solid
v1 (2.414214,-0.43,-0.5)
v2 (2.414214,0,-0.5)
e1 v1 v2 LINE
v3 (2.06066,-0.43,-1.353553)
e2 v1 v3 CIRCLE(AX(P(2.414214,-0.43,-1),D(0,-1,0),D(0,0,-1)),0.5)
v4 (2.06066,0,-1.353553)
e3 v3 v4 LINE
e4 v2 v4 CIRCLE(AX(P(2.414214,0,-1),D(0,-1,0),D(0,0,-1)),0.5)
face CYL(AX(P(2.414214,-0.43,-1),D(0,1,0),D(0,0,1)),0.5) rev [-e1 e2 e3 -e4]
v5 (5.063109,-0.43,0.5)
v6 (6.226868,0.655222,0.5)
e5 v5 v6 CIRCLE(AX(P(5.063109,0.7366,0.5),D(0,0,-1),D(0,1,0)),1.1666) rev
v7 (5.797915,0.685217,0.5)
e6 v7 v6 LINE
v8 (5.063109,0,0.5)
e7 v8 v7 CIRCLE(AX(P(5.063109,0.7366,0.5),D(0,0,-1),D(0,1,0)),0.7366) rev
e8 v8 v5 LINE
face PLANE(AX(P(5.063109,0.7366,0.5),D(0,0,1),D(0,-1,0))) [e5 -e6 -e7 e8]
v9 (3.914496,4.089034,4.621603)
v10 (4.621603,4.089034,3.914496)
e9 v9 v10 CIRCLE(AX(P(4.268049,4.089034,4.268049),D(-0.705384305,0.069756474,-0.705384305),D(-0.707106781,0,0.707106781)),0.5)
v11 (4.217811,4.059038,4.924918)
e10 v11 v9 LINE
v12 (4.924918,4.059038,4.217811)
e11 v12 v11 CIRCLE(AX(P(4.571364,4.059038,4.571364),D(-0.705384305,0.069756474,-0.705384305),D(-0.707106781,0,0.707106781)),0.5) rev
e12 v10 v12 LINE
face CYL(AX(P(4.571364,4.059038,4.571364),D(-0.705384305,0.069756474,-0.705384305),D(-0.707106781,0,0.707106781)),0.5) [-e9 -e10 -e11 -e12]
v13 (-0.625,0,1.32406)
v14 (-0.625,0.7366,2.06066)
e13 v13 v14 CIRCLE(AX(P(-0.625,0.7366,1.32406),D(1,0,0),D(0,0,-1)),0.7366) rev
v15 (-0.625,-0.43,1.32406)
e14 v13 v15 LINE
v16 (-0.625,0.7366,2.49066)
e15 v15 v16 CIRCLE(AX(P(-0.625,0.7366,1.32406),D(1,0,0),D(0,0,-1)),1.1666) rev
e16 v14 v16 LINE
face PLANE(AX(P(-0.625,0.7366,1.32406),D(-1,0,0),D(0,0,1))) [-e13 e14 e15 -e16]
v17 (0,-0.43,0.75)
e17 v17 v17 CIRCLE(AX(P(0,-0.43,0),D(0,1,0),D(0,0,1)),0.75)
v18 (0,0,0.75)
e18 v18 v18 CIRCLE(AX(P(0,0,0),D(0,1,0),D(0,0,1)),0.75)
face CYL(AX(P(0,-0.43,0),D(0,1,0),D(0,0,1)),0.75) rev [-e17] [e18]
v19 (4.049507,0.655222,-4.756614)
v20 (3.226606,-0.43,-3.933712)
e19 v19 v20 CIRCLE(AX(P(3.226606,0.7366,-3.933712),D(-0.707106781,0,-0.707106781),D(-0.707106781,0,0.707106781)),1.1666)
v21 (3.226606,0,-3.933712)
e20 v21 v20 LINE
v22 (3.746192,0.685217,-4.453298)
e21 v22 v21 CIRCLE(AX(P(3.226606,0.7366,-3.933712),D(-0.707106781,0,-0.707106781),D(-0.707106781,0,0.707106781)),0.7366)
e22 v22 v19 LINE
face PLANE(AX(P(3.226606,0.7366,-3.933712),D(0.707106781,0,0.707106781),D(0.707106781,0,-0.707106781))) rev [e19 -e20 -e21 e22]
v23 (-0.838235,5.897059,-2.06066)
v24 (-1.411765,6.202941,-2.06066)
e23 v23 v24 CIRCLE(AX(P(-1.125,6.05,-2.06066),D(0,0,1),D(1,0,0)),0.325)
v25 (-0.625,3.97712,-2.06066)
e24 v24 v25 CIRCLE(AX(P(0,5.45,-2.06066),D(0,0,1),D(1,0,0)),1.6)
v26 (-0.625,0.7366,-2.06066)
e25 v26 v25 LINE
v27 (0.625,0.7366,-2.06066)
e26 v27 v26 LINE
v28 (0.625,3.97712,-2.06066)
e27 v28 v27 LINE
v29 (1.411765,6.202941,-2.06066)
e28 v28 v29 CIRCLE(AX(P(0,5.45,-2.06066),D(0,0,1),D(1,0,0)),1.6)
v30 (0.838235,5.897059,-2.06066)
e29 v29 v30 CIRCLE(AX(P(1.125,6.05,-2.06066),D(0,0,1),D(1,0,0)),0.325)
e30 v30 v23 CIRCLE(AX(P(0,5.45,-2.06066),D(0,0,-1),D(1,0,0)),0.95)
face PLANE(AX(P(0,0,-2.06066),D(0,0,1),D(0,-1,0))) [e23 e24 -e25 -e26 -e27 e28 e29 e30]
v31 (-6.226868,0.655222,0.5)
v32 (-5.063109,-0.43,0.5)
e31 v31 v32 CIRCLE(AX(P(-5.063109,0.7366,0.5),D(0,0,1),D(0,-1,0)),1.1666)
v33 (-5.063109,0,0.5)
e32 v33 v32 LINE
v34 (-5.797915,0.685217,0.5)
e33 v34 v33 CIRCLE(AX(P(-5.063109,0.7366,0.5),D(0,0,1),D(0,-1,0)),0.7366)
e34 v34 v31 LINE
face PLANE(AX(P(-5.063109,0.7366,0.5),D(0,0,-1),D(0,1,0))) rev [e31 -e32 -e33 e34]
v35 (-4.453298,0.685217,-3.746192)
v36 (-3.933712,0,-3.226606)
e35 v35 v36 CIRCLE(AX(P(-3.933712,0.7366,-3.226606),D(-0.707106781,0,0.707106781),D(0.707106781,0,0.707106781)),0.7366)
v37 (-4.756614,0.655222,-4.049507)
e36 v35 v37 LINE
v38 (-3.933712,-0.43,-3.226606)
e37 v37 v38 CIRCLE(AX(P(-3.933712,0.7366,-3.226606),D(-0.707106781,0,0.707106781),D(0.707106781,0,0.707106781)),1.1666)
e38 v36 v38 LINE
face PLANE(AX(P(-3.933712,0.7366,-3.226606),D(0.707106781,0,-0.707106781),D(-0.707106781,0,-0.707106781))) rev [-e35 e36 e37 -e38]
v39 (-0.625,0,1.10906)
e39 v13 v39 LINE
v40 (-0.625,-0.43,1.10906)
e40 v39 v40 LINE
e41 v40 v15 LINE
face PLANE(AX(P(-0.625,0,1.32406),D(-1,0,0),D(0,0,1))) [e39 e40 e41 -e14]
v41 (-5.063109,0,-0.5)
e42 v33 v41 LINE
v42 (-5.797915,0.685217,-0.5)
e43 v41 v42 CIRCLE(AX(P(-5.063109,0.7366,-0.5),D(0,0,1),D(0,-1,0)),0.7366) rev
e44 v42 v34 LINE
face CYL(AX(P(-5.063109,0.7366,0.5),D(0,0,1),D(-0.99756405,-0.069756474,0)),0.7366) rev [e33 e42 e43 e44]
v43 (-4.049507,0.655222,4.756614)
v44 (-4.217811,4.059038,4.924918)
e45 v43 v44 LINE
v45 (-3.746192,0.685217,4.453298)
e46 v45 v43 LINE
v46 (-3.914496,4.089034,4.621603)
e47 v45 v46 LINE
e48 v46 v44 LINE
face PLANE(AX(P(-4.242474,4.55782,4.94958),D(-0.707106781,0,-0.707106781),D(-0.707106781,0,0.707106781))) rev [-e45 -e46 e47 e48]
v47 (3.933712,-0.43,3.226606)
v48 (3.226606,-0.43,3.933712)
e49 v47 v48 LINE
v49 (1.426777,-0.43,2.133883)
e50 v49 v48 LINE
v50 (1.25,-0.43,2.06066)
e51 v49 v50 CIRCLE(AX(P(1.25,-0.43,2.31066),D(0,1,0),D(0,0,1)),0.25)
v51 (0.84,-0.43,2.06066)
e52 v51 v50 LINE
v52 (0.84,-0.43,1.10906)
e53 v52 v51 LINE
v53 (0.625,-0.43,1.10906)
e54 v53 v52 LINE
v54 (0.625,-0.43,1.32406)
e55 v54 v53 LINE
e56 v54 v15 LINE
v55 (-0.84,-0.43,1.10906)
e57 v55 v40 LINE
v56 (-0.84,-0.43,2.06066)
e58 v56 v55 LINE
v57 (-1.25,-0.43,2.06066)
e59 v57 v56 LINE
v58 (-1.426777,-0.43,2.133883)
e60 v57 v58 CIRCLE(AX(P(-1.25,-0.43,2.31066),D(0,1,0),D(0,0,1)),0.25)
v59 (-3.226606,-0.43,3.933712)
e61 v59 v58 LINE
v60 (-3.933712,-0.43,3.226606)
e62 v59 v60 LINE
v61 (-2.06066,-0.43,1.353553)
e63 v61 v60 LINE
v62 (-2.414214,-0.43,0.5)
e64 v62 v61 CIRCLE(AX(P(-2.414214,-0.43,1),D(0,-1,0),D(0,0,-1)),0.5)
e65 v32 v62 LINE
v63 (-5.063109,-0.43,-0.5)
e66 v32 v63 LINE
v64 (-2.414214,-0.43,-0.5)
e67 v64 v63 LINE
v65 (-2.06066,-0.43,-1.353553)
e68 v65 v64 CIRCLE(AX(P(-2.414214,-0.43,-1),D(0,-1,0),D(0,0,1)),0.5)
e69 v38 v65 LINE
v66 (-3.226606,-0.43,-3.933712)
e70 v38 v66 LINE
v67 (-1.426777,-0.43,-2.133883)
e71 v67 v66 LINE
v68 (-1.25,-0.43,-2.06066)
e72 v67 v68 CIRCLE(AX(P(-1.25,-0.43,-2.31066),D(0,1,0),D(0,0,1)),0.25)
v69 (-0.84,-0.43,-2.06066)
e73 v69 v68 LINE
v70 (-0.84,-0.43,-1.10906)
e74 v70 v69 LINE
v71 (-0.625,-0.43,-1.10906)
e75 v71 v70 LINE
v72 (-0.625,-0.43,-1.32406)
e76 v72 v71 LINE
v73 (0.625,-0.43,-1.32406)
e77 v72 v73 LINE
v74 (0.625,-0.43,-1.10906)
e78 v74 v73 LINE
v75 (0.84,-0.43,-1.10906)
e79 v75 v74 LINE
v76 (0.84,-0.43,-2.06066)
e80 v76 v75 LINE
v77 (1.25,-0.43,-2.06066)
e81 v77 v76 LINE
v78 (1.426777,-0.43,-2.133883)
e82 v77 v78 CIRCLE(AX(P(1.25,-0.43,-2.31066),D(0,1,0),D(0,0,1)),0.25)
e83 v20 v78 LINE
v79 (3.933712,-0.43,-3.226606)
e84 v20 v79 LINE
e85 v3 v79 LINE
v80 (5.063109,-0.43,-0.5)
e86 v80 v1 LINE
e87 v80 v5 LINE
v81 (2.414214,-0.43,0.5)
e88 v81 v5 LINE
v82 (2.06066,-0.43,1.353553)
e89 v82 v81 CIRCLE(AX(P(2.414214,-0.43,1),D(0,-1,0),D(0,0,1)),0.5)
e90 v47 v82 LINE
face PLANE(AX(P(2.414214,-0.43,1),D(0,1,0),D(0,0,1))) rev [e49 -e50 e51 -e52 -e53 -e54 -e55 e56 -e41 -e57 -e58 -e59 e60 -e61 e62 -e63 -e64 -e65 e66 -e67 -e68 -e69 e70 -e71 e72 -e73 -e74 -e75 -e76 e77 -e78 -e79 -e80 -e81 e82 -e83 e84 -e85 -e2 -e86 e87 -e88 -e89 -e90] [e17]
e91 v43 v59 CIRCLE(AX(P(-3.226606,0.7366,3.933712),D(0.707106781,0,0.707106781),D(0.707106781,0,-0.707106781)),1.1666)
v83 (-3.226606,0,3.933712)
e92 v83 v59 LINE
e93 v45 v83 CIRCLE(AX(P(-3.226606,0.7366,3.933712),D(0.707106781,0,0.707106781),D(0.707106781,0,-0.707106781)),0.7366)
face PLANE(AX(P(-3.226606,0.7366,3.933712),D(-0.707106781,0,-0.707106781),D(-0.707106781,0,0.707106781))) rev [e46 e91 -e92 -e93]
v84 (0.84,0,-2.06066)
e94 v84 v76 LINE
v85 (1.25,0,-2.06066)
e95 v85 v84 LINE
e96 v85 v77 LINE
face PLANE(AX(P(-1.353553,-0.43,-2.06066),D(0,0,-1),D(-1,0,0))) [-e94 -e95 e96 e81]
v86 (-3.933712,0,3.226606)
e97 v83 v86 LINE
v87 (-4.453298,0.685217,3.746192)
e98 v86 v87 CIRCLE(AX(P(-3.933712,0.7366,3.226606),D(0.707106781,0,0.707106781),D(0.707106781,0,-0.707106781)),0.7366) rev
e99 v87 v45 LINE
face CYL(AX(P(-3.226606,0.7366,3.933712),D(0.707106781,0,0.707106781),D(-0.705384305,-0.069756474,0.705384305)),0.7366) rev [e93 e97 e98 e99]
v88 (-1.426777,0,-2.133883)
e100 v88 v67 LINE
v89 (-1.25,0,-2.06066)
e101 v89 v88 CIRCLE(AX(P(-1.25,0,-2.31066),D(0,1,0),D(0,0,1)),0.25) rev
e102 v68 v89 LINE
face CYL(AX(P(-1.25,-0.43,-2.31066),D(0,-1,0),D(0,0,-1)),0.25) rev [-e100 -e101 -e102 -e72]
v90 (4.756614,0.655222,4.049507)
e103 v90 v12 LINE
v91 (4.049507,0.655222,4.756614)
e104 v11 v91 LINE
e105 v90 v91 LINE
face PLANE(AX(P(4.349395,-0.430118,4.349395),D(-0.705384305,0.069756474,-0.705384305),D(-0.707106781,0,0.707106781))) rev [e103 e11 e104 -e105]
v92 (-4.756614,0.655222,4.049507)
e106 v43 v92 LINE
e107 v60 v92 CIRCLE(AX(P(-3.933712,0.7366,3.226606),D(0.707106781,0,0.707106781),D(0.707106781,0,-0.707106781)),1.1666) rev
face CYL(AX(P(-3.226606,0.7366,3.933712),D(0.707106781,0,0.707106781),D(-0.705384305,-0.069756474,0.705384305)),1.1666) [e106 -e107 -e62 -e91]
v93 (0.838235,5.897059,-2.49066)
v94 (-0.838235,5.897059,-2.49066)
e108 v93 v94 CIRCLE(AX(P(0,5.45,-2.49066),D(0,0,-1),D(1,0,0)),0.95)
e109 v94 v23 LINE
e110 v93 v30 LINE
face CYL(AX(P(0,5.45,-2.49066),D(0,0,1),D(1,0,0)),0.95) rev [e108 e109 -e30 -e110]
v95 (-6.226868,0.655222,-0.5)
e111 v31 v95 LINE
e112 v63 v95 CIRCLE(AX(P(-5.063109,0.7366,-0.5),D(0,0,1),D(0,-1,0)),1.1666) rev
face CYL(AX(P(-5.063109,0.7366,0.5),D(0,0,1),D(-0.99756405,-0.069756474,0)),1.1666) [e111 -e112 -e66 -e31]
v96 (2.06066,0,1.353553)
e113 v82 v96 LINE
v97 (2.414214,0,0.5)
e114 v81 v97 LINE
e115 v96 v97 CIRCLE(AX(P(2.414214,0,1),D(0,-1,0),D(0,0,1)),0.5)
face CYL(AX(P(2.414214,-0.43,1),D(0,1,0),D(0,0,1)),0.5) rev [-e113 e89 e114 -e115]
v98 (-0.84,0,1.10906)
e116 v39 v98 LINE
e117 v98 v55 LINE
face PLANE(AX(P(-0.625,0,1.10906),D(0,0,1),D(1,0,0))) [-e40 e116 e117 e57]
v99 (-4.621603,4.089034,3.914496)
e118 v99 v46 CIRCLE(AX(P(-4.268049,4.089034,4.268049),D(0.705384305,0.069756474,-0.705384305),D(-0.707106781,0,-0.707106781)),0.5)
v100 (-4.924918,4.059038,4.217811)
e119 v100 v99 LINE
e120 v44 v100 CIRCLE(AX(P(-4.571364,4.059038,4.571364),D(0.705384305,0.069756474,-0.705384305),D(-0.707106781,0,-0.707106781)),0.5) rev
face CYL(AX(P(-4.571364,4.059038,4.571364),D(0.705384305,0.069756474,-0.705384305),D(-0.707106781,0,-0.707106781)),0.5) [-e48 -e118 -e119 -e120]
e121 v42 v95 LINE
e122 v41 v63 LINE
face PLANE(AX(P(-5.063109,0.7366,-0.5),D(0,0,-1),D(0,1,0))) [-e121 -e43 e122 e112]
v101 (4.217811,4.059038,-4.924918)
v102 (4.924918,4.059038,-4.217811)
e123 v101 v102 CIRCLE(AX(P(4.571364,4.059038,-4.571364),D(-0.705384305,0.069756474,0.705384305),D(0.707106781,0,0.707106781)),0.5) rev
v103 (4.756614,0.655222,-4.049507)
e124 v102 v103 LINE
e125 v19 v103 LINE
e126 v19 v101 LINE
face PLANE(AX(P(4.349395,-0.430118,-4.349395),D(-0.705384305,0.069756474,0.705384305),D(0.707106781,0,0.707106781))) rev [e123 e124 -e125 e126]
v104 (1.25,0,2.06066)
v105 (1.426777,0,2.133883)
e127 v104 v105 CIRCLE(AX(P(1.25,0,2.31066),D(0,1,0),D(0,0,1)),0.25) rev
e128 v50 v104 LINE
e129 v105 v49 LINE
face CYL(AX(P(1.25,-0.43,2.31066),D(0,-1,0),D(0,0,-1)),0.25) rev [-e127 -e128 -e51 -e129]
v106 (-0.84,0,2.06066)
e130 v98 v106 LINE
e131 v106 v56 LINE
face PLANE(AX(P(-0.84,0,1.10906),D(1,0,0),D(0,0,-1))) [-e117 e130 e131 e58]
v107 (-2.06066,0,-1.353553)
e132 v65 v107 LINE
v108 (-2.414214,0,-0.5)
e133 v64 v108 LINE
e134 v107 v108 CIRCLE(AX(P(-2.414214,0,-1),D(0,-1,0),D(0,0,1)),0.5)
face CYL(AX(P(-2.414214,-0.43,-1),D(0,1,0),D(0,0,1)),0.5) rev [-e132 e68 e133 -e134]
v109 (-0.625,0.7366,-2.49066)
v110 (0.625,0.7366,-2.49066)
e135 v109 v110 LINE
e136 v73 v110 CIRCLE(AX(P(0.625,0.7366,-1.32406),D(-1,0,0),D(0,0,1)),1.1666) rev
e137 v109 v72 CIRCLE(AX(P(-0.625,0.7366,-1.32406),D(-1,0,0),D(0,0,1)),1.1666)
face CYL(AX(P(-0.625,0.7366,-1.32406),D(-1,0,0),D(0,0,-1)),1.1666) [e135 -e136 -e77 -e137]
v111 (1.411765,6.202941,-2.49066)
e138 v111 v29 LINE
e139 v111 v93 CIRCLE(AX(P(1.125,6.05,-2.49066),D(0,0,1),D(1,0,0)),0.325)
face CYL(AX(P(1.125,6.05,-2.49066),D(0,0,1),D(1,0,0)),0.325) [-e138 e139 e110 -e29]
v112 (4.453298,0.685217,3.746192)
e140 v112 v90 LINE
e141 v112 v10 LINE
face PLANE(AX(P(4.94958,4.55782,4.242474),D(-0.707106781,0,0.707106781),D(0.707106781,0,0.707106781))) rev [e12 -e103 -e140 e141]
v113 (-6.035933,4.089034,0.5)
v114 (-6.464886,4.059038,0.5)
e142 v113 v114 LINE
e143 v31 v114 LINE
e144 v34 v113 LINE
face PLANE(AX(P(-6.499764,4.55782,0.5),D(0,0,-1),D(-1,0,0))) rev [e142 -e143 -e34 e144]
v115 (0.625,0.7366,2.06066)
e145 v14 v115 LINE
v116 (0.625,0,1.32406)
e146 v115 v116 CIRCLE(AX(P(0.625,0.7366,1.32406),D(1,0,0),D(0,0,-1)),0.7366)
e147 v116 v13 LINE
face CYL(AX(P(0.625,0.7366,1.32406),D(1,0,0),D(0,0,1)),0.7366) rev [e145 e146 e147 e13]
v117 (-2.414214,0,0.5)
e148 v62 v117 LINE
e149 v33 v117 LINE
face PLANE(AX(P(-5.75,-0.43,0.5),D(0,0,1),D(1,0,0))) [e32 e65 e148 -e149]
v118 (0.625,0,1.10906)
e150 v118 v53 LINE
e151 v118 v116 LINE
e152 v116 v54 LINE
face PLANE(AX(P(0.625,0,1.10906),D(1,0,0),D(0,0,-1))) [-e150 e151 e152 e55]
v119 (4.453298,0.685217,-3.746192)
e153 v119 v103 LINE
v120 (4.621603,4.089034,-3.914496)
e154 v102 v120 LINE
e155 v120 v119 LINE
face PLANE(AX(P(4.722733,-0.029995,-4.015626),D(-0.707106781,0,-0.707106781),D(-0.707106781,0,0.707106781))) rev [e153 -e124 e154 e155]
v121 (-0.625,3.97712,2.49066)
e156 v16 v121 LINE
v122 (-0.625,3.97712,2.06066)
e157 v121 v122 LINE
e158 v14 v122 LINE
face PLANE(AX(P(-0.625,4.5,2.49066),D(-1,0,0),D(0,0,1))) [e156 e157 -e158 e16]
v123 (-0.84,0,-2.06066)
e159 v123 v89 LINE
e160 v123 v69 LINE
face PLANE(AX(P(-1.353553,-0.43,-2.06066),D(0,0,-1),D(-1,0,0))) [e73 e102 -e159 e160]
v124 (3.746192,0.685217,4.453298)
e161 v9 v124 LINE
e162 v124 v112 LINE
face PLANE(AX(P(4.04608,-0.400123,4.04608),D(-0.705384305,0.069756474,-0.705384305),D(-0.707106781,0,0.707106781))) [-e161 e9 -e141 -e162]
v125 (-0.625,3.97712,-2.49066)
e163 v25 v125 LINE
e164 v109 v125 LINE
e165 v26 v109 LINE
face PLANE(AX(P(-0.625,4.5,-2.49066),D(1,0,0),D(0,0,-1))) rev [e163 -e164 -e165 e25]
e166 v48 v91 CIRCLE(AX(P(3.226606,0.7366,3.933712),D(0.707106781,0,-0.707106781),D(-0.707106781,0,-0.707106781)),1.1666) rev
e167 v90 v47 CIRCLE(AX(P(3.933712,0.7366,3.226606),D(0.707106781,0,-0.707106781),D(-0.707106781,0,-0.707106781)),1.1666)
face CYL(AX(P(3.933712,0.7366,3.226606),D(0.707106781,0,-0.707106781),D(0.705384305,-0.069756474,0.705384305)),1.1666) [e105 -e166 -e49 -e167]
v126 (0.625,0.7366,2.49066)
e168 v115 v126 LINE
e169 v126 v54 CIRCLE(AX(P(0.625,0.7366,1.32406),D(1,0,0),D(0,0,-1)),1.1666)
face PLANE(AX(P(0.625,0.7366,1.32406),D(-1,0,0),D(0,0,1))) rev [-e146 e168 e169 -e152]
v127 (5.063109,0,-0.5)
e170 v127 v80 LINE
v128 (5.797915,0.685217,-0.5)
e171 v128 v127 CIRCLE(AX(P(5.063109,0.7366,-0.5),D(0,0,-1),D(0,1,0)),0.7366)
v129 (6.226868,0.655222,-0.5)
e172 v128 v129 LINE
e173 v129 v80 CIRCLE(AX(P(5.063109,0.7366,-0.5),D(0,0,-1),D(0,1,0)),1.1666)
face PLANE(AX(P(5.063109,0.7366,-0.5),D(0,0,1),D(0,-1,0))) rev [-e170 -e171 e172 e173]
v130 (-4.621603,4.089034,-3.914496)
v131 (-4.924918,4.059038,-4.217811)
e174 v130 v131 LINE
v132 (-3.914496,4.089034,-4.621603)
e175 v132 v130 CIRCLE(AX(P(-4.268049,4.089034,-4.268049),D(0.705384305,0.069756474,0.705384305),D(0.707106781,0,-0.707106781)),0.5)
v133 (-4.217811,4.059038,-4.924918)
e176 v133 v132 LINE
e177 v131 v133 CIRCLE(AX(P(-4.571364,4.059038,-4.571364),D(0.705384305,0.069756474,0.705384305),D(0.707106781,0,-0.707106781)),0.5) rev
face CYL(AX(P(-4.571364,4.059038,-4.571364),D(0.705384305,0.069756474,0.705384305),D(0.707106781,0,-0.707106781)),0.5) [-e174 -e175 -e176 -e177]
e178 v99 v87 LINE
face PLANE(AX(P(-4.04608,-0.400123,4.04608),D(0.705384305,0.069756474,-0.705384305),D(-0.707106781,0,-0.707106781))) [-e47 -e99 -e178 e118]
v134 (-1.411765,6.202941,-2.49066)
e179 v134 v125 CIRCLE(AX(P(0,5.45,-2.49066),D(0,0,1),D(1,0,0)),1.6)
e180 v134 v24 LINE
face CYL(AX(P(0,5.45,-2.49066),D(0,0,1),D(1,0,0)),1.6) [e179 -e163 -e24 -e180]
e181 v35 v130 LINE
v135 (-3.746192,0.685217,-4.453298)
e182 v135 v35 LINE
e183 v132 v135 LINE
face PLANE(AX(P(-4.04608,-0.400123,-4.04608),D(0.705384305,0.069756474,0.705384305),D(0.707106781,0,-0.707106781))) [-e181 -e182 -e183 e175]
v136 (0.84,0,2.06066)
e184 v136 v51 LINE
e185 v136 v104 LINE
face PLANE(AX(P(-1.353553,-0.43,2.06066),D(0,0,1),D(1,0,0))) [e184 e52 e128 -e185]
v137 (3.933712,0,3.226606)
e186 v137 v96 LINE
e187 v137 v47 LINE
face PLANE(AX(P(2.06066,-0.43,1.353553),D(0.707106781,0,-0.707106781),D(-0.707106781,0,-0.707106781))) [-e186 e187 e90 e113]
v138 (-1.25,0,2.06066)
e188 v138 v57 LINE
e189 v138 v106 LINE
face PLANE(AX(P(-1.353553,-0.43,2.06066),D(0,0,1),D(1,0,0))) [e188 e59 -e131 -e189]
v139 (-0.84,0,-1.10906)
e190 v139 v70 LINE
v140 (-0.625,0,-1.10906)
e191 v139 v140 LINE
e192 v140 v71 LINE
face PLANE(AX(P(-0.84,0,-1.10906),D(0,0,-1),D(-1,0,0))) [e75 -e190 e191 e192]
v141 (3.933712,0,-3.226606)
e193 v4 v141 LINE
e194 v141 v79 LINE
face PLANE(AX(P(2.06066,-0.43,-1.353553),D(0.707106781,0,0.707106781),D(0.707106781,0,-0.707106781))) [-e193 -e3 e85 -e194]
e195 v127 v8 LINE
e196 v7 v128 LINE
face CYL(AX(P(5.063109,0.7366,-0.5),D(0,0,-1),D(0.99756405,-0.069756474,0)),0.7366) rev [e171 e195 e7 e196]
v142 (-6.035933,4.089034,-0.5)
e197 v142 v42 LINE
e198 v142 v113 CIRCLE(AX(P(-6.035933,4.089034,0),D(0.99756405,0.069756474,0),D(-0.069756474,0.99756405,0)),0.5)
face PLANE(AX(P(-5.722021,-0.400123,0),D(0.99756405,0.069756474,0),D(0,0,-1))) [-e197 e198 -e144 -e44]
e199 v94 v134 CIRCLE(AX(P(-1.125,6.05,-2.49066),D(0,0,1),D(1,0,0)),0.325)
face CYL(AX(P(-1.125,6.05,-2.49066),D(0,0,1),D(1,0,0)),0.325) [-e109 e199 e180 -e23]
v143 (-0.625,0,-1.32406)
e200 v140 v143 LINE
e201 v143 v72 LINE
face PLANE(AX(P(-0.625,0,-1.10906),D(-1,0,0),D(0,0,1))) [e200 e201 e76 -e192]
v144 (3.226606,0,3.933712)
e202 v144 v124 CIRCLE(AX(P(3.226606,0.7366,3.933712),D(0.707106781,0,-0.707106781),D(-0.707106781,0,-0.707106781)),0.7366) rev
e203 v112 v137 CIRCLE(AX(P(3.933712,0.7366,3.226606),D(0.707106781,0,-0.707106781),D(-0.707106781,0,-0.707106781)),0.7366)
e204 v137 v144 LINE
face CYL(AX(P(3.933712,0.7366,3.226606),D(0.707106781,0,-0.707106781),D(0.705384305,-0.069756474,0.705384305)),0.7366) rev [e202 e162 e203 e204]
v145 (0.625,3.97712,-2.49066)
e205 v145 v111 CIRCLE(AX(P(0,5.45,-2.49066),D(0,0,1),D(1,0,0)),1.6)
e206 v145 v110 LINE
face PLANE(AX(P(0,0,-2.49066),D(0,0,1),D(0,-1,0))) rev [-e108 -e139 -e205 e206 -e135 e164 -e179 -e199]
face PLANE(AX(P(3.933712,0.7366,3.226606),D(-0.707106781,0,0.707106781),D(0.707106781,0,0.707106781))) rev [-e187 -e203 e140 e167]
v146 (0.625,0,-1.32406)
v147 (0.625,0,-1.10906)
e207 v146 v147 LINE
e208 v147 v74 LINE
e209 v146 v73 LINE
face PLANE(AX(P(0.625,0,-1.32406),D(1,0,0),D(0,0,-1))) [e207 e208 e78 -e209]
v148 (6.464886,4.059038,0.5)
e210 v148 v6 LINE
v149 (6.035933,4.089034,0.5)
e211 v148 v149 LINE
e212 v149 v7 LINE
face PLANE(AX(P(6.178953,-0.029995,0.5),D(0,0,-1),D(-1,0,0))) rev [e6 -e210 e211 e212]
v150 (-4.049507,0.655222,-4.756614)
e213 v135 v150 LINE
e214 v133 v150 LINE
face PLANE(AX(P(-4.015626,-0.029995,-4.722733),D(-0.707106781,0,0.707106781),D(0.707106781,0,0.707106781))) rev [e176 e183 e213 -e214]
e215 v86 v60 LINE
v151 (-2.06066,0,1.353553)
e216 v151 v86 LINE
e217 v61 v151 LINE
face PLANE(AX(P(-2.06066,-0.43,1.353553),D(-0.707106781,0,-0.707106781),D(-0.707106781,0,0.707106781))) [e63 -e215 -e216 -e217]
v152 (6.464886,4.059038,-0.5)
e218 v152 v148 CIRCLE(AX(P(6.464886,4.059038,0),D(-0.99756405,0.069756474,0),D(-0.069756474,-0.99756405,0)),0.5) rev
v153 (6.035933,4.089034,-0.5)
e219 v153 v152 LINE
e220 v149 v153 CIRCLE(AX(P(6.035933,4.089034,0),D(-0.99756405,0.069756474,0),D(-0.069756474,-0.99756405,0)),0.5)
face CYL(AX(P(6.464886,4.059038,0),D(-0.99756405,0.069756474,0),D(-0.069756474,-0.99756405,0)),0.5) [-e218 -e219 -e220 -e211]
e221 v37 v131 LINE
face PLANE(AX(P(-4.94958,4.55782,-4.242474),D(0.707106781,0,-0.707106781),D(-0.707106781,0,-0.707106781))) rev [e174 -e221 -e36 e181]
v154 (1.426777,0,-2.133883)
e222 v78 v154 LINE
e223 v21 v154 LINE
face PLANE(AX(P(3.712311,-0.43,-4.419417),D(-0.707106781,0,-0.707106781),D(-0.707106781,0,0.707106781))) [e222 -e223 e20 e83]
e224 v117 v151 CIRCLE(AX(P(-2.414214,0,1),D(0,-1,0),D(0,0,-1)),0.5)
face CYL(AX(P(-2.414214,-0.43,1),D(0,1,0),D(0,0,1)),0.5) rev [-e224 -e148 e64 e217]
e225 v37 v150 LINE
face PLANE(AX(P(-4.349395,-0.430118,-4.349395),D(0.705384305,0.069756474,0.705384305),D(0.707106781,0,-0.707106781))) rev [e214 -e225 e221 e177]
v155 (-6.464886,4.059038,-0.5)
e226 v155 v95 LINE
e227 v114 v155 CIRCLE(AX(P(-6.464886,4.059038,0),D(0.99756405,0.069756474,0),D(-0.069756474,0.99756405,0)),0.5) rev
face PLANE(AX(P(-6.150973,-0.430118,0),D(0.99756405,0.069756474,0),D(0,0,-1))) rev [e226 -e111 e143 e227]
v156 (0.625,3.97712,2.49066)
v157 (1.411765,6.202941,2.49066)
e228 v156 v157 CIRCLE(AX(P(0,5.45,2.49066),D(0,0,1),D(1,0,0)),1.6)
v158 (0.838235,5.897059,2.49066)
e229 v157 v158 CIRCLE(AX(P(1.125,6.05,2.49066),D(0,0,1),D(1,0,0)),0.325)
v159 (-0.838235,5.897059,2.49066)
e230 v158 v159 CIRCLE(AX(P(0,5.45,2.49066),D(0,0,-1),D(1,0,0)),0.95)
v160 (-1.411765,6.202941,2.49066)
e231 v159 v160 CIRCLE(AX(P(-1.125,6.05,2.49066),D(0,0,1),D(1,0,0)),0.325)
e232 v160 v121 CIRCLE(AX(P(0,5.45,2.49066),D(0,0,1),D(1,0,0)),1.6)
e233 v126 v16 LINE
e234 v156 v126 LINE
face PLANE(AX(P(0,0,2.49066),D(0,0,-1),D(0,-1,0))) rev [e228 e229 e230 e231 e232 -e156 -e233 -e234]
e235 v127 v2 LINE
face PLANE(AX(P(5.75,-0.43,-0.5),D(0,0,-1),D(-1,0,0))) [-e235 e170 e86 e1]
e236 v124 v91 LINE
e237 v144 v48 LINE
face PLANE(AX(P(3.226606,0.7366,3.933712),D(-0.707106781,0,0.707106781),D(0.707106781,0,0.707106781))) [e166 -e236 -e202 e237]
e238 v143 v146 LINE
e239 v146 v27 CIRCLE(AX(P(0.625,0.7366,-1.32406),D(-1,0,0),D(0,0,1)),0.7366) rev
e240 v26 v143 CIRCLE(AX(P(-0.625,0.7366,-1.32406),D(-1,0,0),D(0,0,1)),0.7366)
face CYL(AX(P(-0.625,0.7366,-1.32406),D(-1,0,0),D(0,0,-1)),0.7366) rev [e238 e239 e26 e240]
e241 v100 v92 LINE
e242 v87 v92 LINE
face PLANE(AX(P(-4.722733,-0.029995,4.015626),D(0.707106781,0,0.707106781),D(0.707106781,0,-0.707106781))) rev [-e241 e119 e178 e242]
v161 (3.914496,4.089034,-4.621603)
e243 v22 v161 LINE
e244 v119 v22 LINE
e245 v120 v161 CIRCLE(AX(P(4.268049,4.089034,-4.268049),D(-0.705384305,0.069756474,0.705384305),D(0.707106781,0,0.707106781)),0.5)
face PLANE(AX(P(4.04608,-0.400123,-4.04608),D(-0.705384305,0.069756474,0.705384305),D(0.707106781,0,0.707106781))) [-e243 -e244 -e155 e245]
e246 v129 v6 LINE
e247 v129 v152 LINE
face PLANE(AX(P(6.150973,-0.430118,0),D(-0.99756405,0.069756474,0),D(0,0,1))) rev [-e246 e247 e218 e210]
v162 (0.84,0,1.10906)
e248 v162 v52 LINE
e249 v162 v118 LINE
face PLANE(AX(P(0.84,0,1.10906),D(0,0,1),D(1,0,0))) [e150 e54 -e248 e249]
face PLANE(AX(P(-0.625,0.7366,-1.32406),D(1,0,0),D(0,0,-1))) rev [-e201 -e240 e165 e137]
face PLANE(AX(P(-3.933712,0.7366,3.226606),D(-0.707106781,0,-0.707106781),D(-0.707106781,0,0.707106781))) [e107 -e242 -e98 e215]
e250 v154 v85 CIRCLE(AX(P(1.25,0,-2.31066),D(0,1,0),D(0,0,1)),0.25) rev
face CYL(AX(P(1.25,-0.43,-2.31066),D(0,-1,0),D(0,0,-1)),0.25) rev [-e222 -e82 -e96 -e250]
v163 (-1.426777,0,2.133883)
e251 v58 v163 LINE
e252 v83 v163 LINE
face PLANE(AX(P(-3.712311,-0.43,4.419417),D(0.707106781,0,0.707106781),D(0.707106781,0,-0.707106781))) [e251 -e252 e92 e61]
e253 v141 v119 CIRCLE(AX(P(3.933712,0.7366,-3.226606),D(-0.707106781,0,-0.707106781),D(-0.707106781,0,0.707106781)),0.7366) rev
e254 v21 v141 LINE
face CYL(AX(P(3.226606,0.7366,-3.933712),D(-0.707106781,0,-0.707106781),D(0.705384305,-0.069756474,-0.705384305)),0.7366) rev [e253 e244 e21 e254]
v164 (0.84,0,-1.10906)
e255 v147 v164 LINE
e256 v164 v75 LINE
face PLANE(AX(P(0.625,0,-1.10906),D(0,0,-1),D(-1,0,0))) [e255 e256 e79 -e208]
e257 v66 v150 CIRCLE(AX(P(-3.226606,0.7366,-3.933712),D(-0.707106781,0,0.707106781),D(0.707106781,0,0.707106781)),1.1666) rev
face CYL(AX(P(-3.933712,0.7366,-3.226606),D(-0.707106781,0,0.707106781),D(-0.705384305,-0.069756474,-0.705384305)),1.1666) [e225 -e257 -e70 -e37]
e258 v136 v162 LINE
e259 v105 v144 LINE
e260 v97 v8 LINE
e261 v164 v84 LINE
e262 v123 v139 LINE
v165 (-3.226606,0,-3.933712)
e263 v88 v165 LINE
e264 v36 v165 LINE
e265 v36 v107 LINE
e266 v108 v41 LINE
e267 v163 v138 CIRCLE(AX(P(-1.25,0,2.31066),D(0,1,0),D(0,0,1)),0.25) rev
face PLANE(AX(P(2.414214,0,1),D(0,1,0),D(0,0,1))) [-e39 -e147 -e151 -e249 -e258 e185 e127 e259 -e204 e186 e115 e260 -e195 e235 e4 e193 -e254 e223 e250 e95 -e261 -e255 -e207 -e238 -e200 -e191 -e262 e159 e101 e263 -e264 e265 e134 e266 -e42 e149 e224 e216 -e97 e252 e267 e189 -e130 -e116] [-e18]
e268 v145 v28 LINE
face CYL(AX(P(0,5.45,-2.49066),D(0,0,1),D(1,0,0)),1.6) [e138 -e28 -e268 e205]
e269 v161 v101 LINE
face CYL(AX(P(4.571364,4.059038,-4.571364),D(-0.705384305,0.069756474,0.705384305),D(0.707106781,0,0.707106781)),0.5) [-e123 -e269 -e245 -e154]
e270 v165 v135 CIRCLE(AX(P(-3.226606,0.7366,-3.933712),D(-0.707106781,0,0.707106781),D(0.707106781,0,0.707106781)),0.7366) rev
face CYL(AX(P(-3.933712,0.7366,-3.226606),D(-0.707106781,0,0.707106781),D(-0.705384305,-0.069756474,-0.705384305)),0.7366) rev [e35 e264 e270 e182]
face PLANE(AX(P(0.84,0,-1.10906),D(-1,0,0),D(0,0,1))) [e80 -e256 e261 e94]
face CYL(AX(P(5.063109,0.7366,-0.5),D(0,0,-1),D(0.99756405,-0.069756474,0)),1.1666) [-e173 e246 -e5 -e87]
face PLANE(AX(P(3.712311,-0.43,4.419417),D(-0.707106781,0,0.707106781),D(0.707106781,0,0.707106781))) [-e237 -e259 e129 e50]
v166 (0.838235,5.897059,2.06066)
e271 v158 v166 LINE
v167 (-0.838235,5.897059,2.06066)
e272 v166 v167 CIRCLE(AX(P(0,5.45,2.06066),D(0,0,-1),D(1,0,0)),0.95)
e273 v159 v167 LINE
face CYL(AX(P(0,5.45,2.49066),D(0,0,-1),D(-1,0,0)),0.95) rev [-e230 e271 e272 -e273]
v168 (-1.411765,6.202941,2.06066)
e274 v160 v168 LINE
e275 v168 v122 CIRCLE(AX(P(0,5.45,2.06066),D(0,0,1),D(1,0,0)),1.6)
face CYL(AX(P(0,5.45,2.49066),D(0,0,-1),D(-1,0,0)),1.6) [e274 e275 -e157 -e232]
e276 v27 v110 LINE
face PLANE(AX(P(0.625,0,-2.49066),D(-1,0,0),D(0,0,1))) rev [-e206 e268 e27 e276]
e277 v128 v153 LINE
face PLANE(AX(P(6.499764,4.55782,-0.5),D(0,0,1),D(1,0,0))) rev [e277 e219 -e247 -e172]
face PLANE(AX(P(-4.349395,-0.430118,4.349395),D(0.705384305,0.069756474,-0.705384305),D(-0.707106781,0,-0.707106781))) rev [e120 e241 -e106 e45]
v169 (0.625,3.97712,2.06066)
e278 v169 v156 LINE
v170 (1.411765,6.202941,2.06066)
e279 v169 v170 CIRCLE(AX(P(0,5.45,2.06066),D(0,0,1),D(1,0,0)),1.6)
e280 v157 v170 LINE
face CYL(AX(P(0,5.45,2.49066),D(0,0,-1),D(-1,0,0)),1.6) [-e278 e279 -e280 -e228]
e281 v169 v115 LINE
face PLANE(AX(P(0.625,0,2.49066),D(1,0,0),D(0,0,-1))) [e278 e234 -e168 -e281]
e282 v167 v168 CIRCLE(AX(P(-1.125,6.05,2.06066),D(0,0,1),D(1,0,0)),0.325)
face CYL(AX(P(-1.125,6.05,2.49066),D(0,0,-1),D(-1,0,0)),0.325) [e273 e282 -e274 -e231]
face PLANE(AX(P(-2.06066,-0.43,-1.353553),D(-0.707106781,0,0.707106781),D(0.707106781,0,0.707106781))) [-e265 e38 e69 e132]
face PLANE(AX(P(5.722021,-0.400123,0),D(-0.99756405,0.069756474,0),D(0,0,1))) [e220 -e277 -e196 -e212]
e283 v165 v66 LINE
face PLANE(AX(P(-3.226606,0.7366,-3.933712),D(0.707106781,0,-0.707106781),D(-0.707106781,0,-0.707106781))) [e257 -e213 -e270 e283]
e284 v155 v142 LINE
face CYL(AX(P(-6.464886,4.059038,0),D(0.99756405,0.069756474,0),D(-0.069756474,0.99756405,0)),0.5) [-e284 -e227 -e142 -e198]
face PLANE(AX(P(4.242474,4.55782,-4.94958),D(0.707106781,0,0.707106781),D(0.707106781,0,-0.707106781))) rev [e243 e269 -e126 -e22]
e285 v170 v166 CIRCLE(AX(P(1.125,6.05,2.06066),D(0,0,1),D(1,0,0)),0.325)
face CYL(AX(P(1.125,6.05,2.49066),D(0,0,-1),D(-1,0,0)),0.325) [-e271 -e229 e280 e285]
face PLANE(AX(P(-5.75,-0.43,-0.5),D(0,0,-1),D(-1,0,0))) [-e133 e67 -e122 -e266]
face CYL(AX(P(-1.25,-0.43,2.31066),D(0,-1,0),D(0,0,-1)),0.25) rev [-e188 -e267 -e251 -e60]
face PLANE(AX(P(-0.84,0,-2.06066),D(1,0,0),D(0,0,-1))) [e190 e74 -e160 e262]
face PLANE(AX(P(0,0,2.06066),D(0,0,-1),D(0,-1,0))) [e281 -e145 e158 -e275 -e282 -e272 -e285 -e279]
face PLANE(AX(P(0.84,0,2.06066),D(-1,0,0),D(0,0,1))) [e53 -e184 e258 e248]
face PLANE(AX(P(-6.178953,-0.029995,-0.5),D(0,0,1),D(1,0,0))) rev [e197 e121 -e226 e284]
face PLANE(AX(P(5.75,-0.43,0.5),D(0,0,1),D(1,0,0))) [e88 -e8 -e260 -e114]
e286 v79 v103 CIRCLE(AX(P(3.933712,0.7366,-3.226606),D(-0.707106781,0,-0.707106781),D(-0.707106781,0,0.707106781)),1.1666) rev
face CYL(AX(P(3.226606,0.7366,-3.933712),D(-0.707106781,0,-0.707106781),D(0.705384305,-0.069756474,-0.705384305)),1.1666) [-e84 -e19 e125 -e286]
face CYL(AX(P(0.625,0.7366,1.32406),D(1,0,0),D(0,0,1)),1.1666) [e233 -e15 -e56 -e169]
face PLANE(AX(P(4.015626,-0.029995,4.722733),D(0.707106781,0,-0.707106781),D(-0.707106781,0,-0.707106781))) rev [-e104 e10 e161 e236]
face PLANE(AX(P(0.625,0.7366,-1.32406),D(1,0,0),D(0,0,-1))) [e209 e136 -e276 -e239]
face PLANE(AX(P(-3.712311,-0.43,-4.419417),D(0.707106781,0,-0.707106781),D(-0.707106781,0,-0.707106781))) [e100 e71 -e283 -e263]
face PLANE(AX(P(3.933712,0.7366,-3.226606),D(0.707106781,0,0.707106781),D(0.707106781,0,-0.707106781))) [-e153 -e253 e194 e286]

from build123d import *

# Parameters (mm, degrees)
SKETCH1_R                       = 0.75
BASE_FLANGE1_DEPTH              = 0.43
EDGE_FLANGE1_STRIP_CUT_DEPTH    = 1
EDGE_FLANGE1_DEPTH              = 1
FILLET1_RADIUS                  = 0.5
FILLET1_LENGTH                  = 0.43
CIRPATTERN1_COUNT               = 8
FILLET1_OF_CIRPATTERN1_2_RADIUS = 0.5
FILLET1_OF_CIRPATTERN1_2_LENGTH = 0.43
FILLET1_OF_CIRPATTERN1_3_RADIUS = 0.5
FILLET1_OF_CIRPATTERN1_3_LENGTH = 0.43
FILLET1_OF_CIRPATTERN1_4_RADIUS = 0.5
FILLET1_OF_CIRPATTERN1_4_LENGTH = 0.43
FILLET1_OF_CIRPATTERN1_5_RADIUS = 0.5
FILLET1_OF_CIRPATTERN1_5_LENGTH = 0.43
FILLET1_OF_CIRPATTERN1_6_RADIUS = 0.5
FILLET1_OF_CIRPATTERN1_6_LENGTH = 0.43
EDGE_FLANGE2_STRIP_W            = 3.1932
EDGE_FLANGE2_STRIP_H            = 0.43
EDGE_FLANGE2_STRIP_CUT_DEPTH    = 1.25
EDGE_FLANGE2_RELIEF_W           = 3.4082
EDGE_FLANGE2_RELIEF_H           = 0.215
EDGE_FLANGE2_RELIEF_CUT_DEPTH   = 0.43
EDGE_FLANGE2_DEPTH              = 1.25
TAB1_DEPTH                      = 0.43
FILLET2_R                       = 0.25


# Sheet-metal steps are written as plain solids
with BuildPart() as part:
    # Sketch1 → Base-Flange1 (new body)
    with BuildSketch(Plane(origin=(0, 0, 0), x_dir=(1, 0, 0), z_dir=(0, 1, 0))):
        with BuildLine():
            Line((5.75, 0.5), (2.414213562, 0.5))
            ThreePointArc((2.414213562, 0.5), (1.952273796, 0.808658284), (2.060660172, 1.353553391))
            Line((2.060660172, 1.353553391), (4.419417382, 3.712310601))
            Line((4.419417382, 3.712310601), (3.712310601, 4.419417382))
            Line((3.712310601, 4.419417382), (1.353553391, 2.060660172))
            Line((1.353553391, 2.060660172), (-1.353553391, 2.060660172))
            Line((-1.353553391, 2.060660172), (-3.712310601, 4.419417382))
            Line((-3.712310601, 4.419417382), (-4.419417382, 3.712310601))
            Line((-4.419417382, 3.712310601), (-2.060660172, 1.353553391))
            ThreePointArc((-2.060660172, 1.353553391), (-1.952273796, 0.808658284), (-2.414213562, 0.5))
            Line((-2.414213562, 0.5), (-5.75, 0.5))
            Line((-5.75, 0.5), (-5.75, -0.5))
            Line((-5.75, -0.5), (-2.414213562, -0.5))
            ThreePointArc((-2.414213562, -0.5), (-1.952273796, -0.808658284), (-2.060660172, -1.353553391))
            Line((-2.060660172, -1.353553391), (-4.419417382, -3.712310601))
            Line((-4.419417382, -3.712310601), (-3.712310601, -4.419417382))
            Line((-3.712310601, -4.419417382), (-1.353553391, -2.060660172))
            Line((-1.353553391, -2.060660172), (1.353553391, -2.060660172))
            Line((1.353553391, -2.060660172), (3.712310601, -4.419417382))
            Line((3.712310601, -4.419417382), (4.419417382, -3.712310601))
            Line((4.419417382, -3.712310601), (2.060660172, -1.353553391))
            ThreePointArc((2.060660172, -1.353553391), (1.952273796, -0.808658284), (2.414213562, -0.5))
            Line((2.414213562, -0.5), (5.75, -0.5))
            Line((5.75, -0.5), (5.75, 0.5))
        make_face()
        with Locations(Location((0, 0, 0), (0, 0, 270))):
            Circle(SKETCH1_R, mode=Mode.SUBTRACT)
    extrude(amount=-BASE_FLANGE1_DEPTH)

    # Edge-Flange1 strip (across the edge) → Edge-Flange1 strip cut (cut)
    with BuildSketch(Plane(origin=(4.419417382, 0, -3.712310601), x_dir=(-0.7053843046066381, 0.0697564737441289, 0.7053843046066409), z_dir=(-0.707106781186549, 0, -0.7071067811865462))):
        Polygon((-2.530199428, -0.254121237), (0.655222098, -0.476867609), (0.685217381, -0.047915067), (-2.500204144, 0.174831305), align=None)
    edge_flange1_strip_cut = extrude(amount=EDGE_FLANGE1_STRIP_CUT_DEPTH, mode=Mode.SUBTRACT)

    # Edge-Flange1 section (across the edge) → Edge-Flange1 (add)
    with BuildSketch(Plane(origin=(4.419417382, 0, -3.712310601), x_dir=(-0.7053843046066381, 0.0697564737441289, 0.7053843046066409), z_dir=(-0.707106781186549, 0, -0.7071067811865462))):
        with BuildLine():
            Line((-0.43, 0.686890612), (-0.43, 4.599018513))
            Line((-0.43, 4.599018513), (0, 4.599018513))
            Line((0, 4.599018513), (0, 0.686890612))
            ThreePointArc((0, 0.686890612), (0.197884863, 0.18453062), (0.685217381, -0.047915067))
            Line((0.685217381, -0.047915067), (0.655222098, -0.476867609))
            ThreePointArc((0.655222098, -0.476867609), (-0.116597228, -0.108728674), (-0.43, 0.686890612))
        make_face()
    edge_flange1 = extrude(amount=EDGE_FLANGE1_DEPTH)

    # Fillet1: full round fillet: the end face becomes a half cylinder, R = half its width
    fillet1_face = Plane((4.444369473, 4.572817893, -4.444369473), x_dir=(0.705384304607, -0.069756473744, -0.705384304607), z_dir=(0.049325275616, 0.99756405026, -0.049325275616))  # on the end face: x along it, z out of the body
    fillet1_slab = fillet1_face.offset(-FILLET1_RADIUS / 2) * Box(FILLET1_LENGTH, 2 * FILLET1_RADIUS, FILLET1_RADIUS, mode=Mode.PRIVATE)  # the body's end, R deep
    fillet1_round = Plane((4.419706835, 4.074035868, -4.419706835), x_dir=(0.049325275616, 0.99756405026, -0.049325275616), z_dir=(0.705384304607, -0.069756473744, -0.705384304607)) * Cylinder(FILLET1_RADIUS, FILLET1_LENGTH, mode=Mode.PRIVATE)  # its axis R under the face
    add(fillet1_slab - fillet1_round, mode=Mode.SUBTRACT)

    # CirPattern1: Edge-Flange1 strip cut, Edge-Flange1 ×8 about axis, 2 skipped
    cirpattern1_axis = Axis((0, -0.43, 0), (0, 1, 0))
    add([edge_flange1_strip_cut.rotate(cirpattern1_axis, i * 360 / CIRPATTERN1_COUNT) for i in range(1, CIRPATTERN1_COUNT) if i not in (1, 5)], mode=Mode.SUBTRACT)
    add([edge_flange1.rotate(cirpattern1_axis, i * 360 / CIRPATTERN1_COUNT) for i in range(1, CIRPATTERN1_COUNT) if i not in (1, 5)])

    # Fillet1 of CirPattern1 2: full round fillet: the end face becomes a half cylinder, R = half its width
    fillet1_of_cirpattern1_2_face = Plane((-4.444369473, 4.572817893, -4.444369473), x_dir=(-0.705384304607, -0.069756473744, -0.705384304607), z_dir=(-0.049325275616, 0.99756405026, -0.049325275616))  # on the end face: x along it, z out of the body
    fillet1_of_cirpattern1_2_slab = fillet1_of_cirpattern1_2_face.offset(-FILLET1_OF_CIRPATTERN1_2_RADIUS / 2) * Box(FILLET1_OF_CIRPATTERN1_2_LENGTH, 2 * FILLET1_OF_CIRPATTERN1_2_RADIUS, FILLET1_OF_CIRPATTERN1_2_RADIUS, mode=Mode.PRIVATE)  # the body's end, R deep
    fillet1_of_cirpattern1_2_round = Plane((-4.419706835, 4.074035868, -4.419706835), x_dir=(-0.049325275616, 0.99756405026, -0.049325275616), z_dir=(-0.705384304607, -0.069756473744, -0.705384304607)) * Cylinder(FILLET1_OF_CIRPATTERN1_2_RADIUS, FILLET1_OF_CIRPATTERN1_2_LENGTH, mode=Mode.PRIVATE)  # its axis R under the face
    add(fillet1_of_cirpattern1_2_slab - fillet1_of_cirpattern1_2_round, mode=Mode.SUBTRACT)

    # Fillet1 of CirPattern1 3: full round fillet: the end face becomes a half cylinder, R = half its width
    fillet1_of_cirpattern1_3_face = Plane((-6.285287585, 4.572817893, 0), x_dir=(-0.99756405026, -0.069756473744, 0), z_dir=(-0.069756473744, 0.99756405026, 0))  # on the end face: x along it, z out of the body
    fillet1_of_cirpattern1_3_slab = fillet1_of_cirpattern1_3_face.offset(-FILLET1_OF_CIRPATTERN1_3_RADIUS / 2) * Box(FILLET1_OF_CIRPATTERN1_3_LENGTH, 2 * FILLET1_OF_CIRPATTERN1_3_RADIUS, FILLET1_OF_CIRPATTERN1_3_RADIUS, mode=Mode.PRIVATE)  # the body's end, R deep
    fillet1_of_cirpattern1_3_round = Plane((-6.250409348, 4.074035868, 0), x_dir=(-0.069756473744, 0.99756405026, 0), z_dir=(-0.99756405026, -0.069756473744, 0)) * Cylinder(FILLET1_OF_CIRPATTERN1_3_RADIUS, FILLET1_OF_CIRPATTERN1_3_LENGTH, mode=Mode.PRIVATE)  # its axis R under the face
    add(fillet1_of_cirpattern1_3_slab - fillet1_of_cirpattern1_3_round, mode=Mode.SUBTRACT)

    # Fillet1 of CirPattern1 4: full round fillet: the end face becomes a half cylinder, R = half its width
    fillet1_of_cirpattern1_4_face = Plane((-4.444369473, 4.572817893, 4.444369473), x_dir=(-0.705384304607, -0.069756473744, 0.705384304607), z_dir=(-0.049325275616, 0.99756405026, 0.049325275616))  # on the end face: x along it, z out of the body
    fillet1_of_cirpattern1_4_slab = fillet1_of_cirpattern1_4_face.offset(-FILLET1_OF_CIRPATTERN1_4_RADIUS / 2) * Box(FILLET1_OF_CIRPATTERN1_4_LENGTH, 2 * FILLET1_OF_CIRPATTERN1_4_RADIUS, FILLET1_OF_CIRPATTERN1_4_RADIUS, mode=Mode.PRIVATE)  # the body's end, R deep
    fillet1_of_cirpattern1_4_round = Plane((-4.419706835, 4.074035868, 4.419706835), x_dir=(-0.049325275616, 0.99756405026, 0.049325275616), z_dir=(-0.705384304607, -0.069756473744, 0.705384304607)) * Cylinder(FILLET1_OF_CIRPATTERN1_4_RADIUS, FILLET1_OF_CIRPATTERN1_4_LENGTH, mode=Mode.PRIVATE)  # its axis R under the face
    add(fillet1_of_cirpattern1_4_slab - fillet1_of_cirpattern1_4_round, mode=Mode.SUBTRACT)

    # Fillet1 of CirPattern1 5: full round fillet: the end face becomes a half cylinder, R = half its width
    fillet1_of_cirpattern1_5_face = Plane((4.444369473, 4.572817893, 4.444369473), x_dir=(0.705384304607, -0.069756473744, 0.705384304607), z_dir=(0.049325275616, 0.99756405026, 0.049325275616))  # on the end face: x along it, z out of the body
    fillet1_of_cirpattern1_5_slab = fillet1_of_cirpattern1_5_face.offset(-FILLET1_OF_CIRPATTERN1_5_RADIUS / 2) * Box(FILLET1_OF_CIRPATTERN1_5_LENGTH, 2 * FILLET1_OF_CIRPATTERN1_5_RADIUS, FILLET1_OF_CIRPATTERN1_5_RADIUS, mode=Mode.PRIVATE)  # the body's end, R deep
    fillet1_of_cirpattern1_5_round = Plane((4.419706835, 4.074035868, 4.419706835), x_dir=(0.049325275616, 0.99756405026, 0.049325275616), z_dir=(0.705384304607, -0.069756473744, 0.705384304607)) * Cylinder(FILLET1_OF_CIRPATTERN1_5_RADIUS, FILLET1_OF_CIRPATTERN1_5_LENGTH, mode=Mode.PRIVATE)  # its axis R under the face
    add(fillet1_of_cirpattern1_5_slab - fillet1_of_cirpattern1_5_round, mode=Mode.SUBTRACT)

    # Fillet1 of CirPattern1 6: full round fillet: the end face becomes a half cylinder, R = half its width
    fillet1_of_cirpattern1_6_face = Plane((6.285287585, 4.572817893, 0), x_dir=(0.99756405026, -0.069756473744, 0), z_dir=(0.069756473744, 0.99756405026, 0))  # on the end face: x along it, z out of the body
    fillet1_of_cirpattern1_6_slab = fillet1_of_cirpattern1_6_face.offset(-FILLET1_OF_CIRPATTERN1_6_RADIUS / 2) * Box(FILLET1_OF_CIRPATTERN1_6_LENGTH, 2 * FILLET1_OF_CIRPATTERN1_6_RADIUS, FILLET1_OF_CIRPATTERN1_6_RADIUS, mode=Mode.PRIVATE)  # the body's end, R deep
    fillet1_of_cirpattern1_6_round = Plane((6.250409348, 4.074035868, 0), x_dir=(0.069756473744, 0.99756405026, 0), z_dir=(0.99756405026, -0.069756473744, 0)) * Cylinder(FILLET1_OF_CIRPATTERN1_6_RADIUS, FILLET1_OF_CIRPATTERN1_6_LENGTH, mode=Mode.PRIVATE)  # its axis R under the face
    add(fillet1_of_cirpattern1_6_slab - fillet1_of_cirpattern1_6_round, mode=Mode.SUBTRACT)

    # Edge-Flange2 strip (across the edge) → Edge-Flange2 strip cut (cut)
    with BuildSketch(Plane(origin=(0.625, 0, -2.060660172), x_dir=(0, 0, 1), z_dir=(-1, 0, 0))):
        with Locations((-0.86, -0.215)):
            Rectangle(EDGE_FLANGE2_STRIP_W, EDGE_FLANGE2_STRIP_H)
    edge_flange2_strip_cut = extrude(amount=EDGE_FLANGE2_STRIP_CUT_DEPTH, mode=Mode.SUBTRACT)

    # Edge-Flange2 relief (on the sheet) → Edge-Flange2 relief cut (cut)
    with BuildSketch(Plane(origin=(0.625, 0, -1.324060172), x_dir=(0, 0, 1), z_dir=(0, 1, 0))):
        with Locations((-1.4891, 0.1075)):
            Rectangle(EDGE_FLANGE2_RELIEF_W, EDGE_FLANGE2_RELIEF_H)
        with Locations((-1.4891, -1.3575)):
            Rectangle(EDGE_FLANGE2_RELIEF_W, EDGE_FLANGE2_RELIEF_H)
    edge_flange2_relief_cut = extrude(amount=-EDGE_FLANGE2_RELIEF_CUT_DEPTH, mode=Mode.SUBTRACT)

    # Edge-Flange2 section (across the edge) → Edge-Flange2 (add)
    with BuildSketch(Plane(origin=(0.625, 0, -2.060660172), x_dir=(0, 0, 1), z_dir=(-1, 0, 0))):
        with BuildLine():
            Line((-0.43, 0.7366), (-0.43, 4.5))
            Line((-0.43, 4.5), (0, 4.5))
            Line((0, 4.5), (0, 0.7366))
            ThreePointArc((0, 0.7366), (0.215745145, 0.215745145), (0.7366, 0))
            Line((0.7366, 0), (0.7366, -0.43))
            ThreePointArc((0.7366, -0.43), (-0.088310771, -0.088310771), (-0.43, 0.7366))
        make_face()
    edge_flange2 = extrude(amount=EDGE_FLANGE2_DEPTH)

    # Sketch13 → Tab1 (add)
    with BuildSketch(Plane.XY.offset(-2.060660172)):
        with BuildLine():
            ThreePointArc((-1.411764706, 6.202941176), (0, 3.85), (1.411764706, 6.202941176))
            ThreePointArc((1.411764706, 6.202941176), (0.972058824, 6.336764706), (0.838235294, 5.897058824))
            ThreePointArc((0.838235294, 5.897058824), (0, 4.5), (-0.838235294, 5.897058824))
            ThreePointArc((-0.838235294, 5.897058824), (-0.972058824, 6.336764706), (-1.411764706, 6.202941176))
        make_face()
    tab1 = extrude(amount=-TAB1_DEPTH)

    # Mirror1: Edge-Flange2 strip cut, Edge-Flange2 relief cut, Edge-Flange2, Tab1 across plane
    add(edge_flange2_strip_cut.mirror(Plane.XY), mode=Mode.SUBTRACT)
    add(edge_flange2_relief_cut.mirror(Plane.XY), mode=Mode.SUBTRACT)
    add(edge_flange2.mirror(Plane.XY))
    add(tab1.mirror(Plane.XY))

    # Fillet2
    fillet2_edges = [part.edges().sort_by_distance(p)[0] for p in [
        (1.353553391, -0.215, 2.060660172),
        (-1.353553391, -0.215, 2.060660172),
        (-1.353553391, -0.215, -2.060660172),
        (1.353553391, -0.215, -2.060660172),
    ]]
    fillet(fillet2_edges, radius=FILLET2_R)


solid = part.part
